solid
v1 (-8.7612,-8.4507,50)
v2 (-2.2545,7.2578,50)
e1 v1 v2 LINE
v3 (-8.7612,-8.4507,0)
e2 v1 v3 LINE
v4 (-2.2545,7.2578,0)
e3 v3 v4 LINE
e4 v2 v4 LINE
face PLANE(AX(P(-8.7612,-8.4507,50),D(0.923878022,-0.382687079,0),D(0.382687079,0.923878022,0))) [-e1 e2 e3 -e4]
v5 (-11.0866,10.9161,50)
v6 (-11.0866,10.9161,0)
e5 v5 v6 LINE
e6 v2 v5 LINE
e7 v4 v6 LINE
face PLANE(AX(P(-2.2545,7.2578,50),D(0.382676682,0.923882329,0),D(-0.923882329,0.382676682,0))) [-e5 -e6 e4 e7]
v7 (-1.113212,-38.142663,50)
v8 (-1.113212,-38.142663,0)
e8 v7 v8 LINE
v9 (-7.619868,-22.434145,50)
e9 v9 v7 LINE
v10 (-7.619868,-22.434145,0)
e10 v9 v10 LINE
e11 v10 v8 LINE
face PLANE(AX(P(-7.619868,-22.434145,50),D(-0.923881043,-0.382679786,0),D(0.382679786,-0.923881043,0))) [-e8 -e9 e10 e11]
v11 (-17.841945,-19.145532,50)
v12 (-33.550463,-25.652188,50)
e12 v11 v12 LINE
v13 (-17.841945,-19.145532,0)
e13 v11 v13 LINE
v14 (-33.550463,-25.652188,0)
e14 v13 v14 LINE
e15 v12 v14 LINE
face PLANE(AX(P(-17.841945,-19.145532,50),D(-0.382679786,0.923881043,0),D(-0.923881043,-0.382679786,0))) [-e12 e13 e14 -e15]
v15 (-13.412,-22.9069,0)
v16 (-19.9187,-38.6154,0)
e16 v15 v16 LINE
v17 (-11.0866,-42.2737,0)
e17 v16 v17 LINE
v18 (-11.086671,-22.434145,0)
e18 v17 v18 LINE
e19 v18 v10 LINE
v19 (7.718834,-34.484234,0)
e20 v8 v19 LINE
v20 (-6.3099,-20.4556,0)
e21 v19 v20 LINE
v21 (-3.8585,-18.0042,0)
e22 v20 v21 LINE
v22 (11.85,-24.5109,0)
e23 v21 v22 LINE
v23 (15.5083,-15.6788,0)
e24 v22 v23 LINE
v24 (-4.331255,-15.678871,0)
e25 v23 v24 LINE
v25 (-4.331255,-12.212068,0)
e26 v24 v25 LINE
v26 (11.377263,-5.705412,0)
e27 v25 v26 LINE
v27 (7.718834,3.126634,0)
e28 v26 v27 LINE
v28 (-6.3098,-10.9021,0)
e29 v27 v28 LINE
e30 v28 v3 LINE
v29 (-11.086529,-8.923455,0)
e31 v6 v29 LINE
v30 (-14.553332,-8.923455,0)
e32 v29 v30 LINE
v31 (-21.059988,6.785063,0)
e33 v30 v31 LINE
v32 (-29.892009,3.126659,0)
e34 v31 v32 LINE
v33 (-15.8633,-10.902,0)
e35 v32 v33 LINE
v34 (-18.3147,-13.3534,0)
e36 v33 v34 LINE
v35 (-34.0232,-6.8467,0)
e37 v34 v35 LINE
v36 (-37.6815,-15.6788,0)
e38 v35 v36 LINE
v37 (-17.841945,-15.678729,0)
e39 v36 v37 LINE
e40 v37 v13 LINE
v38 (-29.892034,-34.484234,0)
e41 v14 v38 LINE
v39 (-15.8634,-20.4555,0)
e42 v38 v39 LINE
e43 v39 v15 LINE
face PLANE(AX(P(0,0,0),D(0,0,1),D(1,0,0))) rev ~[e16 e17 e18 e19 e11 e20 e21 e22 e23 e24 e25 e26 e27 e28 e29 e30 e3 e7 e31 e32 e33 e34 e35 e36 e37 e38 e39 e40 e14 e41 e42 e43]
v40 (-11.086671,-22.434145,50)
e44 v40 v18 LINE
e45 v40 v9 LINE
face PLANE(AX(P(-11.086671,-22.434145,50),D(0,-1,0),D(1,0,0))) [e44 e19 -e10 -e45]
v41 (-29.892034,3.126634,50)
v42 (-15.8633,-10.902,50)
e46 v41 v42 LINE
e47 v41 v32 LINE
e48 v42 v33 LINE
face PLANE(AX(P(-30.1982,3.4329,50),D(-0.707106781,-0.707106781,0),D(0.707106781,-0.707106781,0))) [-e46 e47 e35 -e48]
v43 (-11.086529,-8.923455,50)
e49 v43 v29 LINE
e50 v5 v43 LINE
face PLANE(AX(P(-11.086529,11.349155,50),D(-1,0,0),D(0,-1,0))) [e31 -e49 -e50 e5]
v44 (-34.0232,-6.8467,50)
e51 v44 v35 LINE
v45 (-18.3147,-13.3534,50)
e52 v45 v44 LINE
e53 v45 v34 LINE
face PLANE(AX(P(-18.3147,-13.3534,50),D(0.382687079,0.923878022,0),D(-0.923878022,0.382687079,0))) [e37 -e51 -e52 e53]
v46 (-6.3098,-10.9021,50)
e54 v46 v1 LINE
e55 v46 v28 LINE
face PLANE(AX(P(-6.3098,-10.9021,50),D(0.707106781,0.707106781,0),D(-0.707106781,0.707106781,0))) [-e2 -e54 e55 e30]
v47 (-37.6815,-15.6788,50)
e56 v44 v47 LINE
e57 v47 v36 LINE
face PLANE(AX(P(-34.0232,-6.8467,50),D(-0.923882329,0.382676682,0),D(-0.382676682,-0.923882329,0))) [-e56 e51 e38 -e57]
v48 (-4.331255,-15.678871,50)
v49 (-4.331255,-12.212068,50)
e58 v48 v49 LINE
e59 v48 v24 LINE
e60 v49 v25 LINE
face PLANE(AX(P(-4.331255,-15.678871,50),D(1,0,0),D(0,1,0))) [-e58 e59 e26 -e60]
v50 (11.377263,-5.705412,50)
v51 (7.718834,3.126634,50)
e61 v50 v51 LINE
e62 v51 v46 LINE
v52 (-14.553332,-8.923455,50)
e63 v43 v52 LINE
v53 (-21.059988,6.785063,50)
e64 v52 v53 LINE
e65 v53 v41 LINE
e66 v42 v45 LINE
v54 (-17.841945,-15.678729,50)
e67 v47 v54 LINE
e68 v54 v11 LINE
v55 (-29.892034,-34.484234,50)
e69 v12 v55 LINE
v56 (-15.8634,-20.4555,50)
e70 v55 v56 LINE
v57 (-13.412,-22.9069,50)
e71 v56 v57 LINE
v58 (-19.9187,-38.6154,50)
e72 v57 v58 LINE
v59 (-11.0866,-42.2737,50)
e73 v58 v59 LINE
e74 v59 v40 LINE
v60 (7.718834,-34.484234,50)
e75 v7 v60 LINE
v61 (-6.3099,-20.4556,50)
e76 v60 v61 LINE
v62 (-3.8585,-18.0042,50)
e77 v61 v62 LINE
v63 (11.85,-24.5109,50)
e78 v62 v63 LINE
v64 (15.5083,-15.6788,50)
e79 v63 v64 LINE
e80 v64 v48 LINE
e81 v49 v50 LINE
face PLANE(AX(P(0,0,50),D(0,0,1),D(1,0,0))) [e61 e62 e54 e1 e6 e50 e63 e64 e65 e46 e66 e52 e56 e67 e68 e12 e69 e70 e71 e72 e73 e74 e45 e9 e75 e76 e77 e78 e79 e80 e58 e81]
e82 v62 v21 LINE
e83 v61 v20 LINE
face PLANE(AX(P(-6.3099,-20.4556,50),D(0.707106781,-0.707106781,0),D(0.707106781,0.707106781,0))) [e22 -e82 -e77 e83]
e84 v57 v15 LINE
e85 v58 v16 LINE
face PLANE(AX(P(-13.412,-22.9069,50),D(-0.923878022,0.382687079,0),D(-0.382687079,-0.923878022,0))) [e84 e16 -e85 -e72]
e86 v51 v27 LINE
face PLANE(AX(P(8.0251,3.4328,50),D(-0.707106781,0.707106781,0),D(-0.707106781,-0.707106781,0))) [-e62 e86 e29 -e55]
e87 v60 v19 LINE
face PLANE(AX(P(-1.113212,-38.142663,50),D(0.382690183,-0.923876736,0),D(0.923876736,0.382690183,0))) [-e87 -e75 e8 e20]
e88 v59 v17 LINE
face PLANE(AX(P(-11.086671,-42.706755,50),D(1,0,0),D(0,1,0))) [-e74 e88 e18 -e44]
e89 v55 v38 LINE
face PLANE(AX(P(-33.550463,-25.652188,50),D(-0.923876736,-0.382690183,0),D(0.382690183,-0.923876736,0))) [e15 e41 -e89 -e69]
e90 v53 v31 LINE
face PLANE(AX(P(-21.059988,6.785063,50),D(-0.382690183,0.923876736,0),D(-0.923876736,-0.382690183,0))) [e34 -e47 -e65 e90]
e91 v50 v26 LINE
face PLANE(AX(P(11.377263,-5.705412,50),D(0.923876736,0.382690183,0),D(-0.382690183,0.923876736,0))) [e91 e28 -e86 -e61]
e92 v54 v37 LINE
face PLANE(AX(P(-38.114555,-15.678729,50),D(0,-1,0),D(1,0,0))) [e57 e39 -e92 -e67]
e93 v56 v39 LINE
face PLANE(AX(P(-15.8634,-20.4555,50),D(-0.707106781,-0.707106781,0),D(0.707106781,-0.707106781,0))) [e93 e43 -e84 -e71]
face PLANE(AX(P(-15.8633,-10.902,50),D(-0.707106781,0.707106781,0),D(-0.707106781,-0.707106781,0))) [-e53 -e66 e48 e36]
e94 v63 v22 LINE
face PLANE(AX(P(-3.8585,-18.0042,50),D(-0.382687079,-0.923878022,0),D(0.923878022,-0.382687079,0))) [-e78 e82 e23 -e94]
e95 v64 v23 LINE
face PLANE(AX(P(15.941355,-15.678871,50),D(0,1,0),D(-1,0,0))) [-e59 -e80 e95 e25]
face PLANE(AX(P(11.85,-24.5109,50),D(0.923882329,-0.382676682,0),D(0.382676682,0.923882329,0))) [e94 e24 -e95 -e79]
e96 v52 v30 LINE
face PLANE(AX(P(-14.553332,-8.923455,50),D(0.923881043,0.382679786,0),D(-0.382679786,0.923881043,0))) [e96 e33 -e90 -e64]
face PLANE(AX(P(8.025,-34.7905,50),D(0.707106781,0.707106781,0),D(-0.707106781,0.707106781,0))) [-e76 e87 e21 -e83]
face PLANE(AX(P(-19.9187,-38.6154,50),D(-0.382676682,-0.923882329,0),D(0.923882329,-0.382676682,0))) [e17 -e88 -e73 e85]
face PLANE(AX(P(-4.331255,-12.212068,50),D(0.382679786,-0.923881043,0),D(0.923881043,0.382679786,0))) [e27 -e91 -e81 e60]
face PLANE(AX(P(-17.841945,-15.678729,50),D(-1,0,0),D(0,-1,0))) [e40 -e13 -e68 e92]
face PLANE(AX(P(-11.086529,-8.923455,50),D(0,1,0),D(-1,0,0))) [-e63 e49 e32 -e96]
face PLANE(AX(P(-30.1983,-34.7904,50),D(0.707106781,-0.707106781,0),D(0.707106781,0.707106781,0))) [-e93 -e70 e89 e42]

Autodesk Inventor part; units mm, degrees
ref_plane "YZ Plane" through (0, 0, 0) normal (1, 0, 0) x (0, 1, 0)
ref_plane "XZ Plane" through (0, 0, 0) normal (0, 1, 0) x (-1, 0, 0)
ref_plane "XY Plane" through (0, 0, 0) normal (0, 0, 1) x (1, 0, 0)
ref_plane "Płaszczyzna konstrukcyjna1" through (0, 0, 0) normal (0, 0, 1) x (1, 0, 0)
sketch "Szkic1" plane through (0, 0, 0) normal (0, 0, 1) x (1, 0, 0)
  line L0 (8.0251, 3.4329) -> (-11.0866, 11.3492) projected
  line L1 (-11.0866, 11.3492) -> (-30.1982, 3.4329) projected
  line L2 (-30.1982, 3.4329) -> (-38.1145, -15.6788) projected
  line L3 (-38.1145, -15.6788) -> (-30.1982, -34.7904) projected
  line L4 (-30.1982, -34.7904) -> (-11.0866, -42.7067) projected
  line L5 (-11.0866, -42.7067) -> (8.0251, -34.7904) projected
  line L6 (8.0251, -34.7904) -> (15.9414, -15.6788) projected
  line L7 (15.9414, -15.6788) -> (8.0251, 3.4329) projected
  point P0 (0, 0)
extrude "Wyciągnięcie proste1" add sketch "Szkic1" along normal blind 50
sketch "Szkic2" plane through (0, 0, 50) normal (0, 0, 1) x (1, 0, 0)
  line L0 (-35.3977, -2.8484) -> (-36.8759, -2.2361) projected
  line L1 (-31.4727, 0.356) -> (-35.1682, 1.8867) projected
  line L2 (8.0251, 3.4329) -> (-11.0866, 11.3492) construction
  line L3 (8.0251, 3.4329) -> (-30.1982, -34.7904) construction
  line L4 (-11.0866, 11.3492) -> (-30.1982, 3.4329) construction
  line L5 (-11.0866, -42.7067) -> (8.0251, -34.7904) construction
  line L6 (-30.1982, 3.4329) -> (8.0251, -34.7904) construction
  line L7 (-30.1982, 3.4329) -> (-38.1145, -15.6788) projected
  line L8 (-30.1982, 3.4329) -> (-15.8633, -10.902)
  line L9 (-15.8633, -10.902) -> (-18.3147, -13.3534)
  line L10 (-18.3147, -13.3534) -> (-34.3927, -6.6936)
  line L11 (-30.1982, 3.4329) -> (-34.3927, -6.6936)
  line L12 (-38.1145, -15.6788) -> (-30.1982, -34.7904) projected
  line L13 (-34.0232, -6.8467) -> (-37.6815, -15.6788)
  line L14 (-38.1145, -15.6788) -> (-11.0866, -15.6788)
  point P0 (0, 0)
  dimension "d7" = 0.4
extrude "Wyciągnięcie proste2" cut sketch "Szkic2" against normal through all
sketch "Szkic3" plane through (0, 0, 50) normal (0, 0, 1) x (1, 0, 0)
  line L0 (8.0251, 3.4329) -> (-11.0866, 11.3492) construction
  line L1 (-30.1982, -34.7904) -> (-11.0866, -42.7067) construction
  line L2 (8.0251, 3.4329) -> (-30.1982, -34.7904) construction
  line L3 (8.0251, -34.7904) -> (-30.1982, 3.4329) construction
  point P0 (0, 0)
  point P1 (-11.0866, -15.6788)
pattern_circular "Szyk kołowy1" count 8 over 360 about axis through (-11.0866, -15.6788, 50) along (0, 0, 1) of "Wyciągnięcie proste2"
properties part number "dopychacz"
